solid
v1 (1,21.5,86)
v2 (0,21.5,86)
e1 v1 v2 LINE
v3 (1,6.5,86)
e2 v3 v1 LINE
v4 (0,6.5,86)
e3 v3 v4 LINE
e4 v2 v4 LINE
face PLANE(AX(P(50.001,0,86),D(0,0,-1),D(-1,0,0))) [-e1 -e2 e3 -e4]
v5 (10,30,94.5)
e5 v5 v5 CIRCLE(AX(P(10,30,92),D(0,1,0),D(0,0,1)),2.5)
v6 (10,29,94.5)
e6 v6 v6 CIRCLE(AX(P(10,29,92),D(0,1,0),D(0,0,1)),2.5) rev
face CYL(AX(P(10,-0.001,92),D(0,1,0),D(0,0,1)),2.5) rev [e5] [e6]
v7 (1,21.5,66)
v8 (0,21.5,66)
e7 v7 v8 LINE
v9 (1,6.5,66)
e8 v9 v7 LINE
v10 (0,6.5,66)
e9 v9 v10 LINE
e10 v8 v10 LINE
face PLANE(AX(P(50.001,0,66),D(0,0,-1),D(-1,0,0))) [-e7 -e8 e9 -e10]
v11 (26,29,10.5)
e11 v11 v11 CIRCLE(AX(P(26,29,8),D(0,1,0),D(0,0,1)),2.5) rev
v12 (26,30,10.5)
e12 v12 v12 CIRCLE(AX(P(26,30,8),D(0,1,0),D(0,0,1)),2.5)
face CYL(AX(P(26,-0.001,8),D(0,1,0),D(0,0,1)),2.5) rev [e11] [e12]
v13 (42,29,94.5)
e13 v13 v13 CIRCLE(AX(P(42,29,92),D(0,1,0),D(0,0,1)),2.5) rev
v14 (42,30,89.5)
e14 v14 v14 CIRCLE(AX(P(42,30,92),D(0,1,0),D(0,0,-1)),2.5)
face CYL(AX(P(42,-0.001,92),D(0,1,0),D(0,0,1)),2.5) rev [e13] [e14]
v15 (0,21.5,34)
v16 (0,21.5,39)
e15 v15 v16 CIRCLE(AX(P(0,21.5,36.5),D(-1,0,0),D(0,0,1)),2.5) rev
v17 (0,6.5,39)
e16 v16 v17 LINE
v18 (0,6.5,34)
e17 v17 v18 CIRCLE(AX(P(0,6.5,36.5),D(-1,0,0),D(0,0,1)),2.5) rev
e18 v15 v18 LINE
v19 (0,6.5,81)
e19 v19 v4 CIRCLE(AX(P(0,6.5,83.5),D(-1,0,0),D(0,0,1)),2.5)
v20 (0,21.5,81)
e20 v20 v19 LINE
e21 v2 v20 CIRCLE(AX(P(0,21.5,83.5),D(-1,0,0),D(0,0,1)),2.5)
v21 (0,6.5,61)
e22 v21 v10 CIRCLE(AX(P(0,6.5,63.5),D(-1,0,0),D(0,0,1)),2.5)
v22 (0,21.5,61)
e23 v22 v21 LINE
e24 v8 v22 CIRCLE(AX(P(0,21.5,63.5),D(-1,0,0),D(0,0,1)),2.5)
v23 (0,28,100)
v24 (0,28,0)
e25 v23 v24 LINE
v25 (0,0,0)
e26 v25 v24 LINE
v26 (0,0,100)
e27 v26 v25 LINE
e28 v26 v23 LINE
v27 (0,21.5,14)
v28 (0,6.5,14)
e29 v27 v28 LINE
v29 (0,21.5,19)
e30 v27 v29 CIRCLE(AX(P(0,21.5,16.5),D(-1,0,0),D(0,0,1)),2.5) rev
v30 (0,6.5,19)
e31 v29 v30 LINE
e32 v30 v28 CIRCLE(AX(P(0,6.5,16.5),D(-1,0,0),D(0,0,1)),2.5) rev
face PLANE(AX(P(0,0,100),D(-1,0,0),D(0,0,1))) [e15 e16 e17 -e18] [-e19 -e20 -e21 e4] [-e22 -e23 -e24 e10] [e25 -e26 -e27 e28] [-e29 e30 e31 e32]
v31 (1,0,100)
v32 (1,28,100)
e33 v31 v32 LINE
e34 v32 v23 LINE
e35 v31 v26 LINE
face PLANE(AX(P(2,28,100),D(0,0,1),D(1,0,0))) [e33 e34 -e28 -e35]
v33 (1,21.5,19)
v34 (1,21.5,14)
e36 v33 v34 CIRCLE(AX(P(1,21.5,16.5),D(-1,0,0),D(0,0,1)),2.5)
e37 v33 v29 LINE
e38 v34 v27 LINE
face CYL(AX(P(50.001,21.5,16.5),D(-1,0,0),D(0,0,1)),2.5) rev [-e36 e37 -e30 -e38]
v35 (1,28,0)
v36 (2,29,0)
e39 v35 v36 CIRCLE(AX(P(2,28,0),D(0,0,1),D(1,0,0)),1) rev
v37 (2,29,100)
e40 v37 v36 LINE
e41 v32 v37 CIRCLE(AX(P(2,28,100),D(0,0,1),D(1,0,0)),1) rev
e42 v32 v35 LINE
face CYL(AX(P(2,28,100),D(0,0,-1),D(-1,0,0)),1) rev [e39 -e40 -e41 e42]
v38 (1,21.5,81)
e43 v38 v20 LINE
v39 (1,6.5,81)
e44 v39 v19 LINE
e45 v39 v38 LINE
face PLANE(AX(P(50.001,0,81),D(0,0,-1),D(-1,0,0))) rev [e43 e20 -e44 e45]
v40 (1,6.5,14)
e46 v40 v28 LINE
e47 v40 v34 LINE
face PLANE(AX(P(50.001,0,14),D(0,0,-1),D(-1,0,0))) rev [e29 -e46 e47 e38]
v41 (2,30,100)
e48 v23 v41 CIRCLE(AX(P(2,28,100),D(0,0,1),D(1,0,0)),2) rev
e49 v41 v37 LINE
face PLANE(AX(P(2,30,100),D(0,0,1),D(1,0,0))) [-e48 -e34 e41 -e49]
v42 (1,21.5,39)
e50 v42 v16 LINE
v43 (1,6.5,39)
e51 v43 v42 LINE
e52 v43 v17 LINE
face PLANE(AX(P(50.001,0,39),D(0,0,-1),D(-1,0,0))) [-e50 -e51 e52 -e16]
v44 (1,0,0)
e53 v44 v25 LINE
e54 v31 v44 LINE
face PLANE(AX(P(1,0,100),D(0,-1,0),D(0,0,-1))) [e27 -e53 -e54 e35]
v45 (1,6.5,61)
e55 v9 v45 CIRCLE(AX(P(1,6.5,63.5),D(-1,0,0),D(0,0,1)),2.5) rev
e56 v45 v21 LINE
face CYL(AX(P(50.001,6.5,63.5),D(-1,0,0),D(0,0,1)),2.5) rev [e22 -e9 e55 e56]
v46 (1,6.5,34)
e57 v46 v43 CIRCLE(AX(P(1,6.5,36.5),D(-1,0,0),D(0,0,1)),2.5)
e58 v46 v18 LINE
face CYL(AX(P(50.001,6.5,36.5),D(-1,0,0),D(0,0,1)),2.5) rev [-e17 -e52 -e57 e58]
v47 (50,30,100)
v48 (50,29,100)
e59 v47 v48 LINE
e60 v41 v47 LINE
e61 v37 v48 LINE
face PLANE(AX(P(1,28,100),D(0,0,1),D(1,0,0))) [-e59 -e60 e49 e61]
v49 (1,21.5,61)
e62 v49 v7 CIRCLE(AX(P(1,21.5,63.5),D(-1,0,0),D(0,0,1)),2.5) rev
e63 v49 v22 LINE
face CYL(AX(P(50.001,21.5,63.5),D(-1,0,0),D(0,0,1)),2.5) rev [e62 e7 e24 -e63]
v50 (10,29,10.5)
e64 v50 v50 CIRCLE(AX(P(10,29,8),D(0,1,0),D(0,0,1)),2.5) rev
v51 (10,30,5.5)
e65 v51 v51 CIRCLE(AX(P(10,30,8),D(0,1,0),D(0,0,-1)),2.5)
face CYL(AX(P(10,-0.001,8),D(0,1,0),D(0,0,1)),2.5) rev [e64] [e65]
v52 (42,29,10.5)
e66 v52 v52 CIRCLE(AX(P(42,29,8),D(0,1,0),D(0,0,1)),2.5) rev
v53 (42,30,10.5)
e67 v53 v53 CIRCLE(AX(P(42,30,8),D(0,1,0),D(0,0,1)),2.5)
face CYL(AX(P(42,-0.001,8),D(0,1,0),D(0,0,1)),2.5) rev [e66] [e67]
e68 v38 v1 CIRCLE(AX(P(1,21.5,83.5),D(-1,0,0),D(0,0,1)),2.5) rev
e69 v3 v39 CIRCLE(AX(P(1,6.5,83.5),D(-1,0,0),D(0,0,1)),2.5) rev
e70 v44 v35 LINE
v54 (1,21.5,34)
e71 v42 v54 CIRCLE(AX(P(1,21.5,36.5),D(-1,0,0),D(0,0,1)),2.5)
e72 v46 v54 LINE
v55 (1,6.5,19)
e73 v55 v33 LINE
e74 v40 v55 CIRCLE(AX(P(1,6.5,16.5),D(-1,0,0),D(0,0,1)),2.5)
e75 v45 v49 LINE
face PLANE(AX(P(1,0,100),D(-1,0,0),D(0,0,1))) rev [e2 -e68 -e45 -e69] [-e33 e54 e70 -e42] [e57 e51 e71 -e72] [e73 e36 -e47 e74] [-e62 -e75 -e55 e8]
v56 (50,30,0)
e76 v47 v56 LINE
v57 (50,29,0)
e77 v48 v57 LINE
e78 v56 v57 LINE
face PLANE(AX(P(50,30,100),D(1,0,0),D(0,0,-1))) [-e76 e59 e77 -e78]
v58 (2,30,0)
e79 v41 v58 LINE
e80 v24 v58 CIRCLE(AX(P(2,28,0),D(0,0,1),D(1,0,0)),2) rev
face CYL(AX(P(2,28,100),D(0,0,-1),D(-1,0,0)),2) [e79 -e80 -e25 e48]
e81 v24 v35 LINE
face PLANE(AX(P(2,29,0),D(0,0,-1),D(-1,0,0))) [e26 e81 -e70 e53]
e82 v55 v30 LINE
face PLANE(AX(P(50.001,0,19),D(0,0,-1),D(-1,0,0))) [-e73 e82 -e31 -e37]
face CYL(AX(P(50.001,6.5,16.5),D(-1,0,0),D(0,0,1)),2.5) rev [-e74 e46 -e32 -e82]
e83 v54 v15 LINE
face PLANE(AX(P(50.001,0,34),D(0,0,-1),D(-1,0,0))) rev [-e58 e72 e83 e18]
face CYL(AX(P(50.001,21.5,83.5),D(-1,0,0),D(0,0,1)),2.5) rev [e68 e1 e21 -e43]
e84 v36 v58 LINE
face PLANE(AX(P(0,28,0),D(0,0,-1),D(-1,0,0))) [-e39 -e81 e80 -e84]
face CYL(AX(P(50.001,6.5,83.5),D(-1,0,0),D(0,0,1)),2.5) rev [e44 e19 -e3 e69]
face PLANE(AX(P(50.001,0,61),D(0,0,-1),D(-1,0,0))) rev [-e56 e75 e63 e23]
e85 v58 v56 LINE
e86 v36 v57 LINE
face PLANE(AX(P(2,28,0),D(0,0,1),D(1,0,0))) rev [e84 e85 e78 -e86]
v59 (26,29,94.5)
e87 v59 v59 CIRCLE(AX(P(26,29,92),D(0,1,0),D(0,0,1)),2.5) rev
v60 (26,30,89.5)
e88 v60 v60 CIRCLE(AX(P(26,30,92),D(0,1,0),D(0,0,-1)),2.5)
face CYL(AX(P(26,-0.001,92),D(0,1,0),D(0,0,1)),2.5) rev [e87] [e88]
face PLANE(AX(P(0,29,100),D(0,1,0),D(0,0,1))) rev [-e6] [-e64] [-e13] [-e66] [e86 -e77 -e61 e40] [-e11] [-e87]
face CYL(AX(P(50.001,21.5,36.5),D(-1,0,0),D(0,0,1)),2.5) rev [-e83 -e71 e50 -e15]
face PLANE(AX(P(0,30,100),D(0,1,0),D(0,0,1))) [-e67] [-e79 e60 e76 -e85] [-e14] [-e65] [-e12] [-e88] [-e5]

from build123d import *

# Parameters (mm, degrees)
BASE_FLANGE1_DEPTH = 100
CUT_EXTRUDE3_REACH = 117.758
SKETCH8_R          = 2.5
CUT_EXTRUDE4_REACH = 117.758
SKETCH11_R         = 2.5


# Sheet-metal steps are written as plain solids
with BuildPart() as part:
    # Sketch2 → Base-Flange1 (new body)
    with BuildSketch(Plane.XY):
        with BuildLine():
            Line((0, 0), (0, 28))
            ThreePointArc((0, 28), (0.585786438, 29.414213562), (2, 30))
            Line((2, 30), (50, 30))
            Line((50, 30), (50, 29))
            Line((50, 29), (2, 29))
            ThreePointArc((2, 29), (1.292893219, 28.707106781), (1, 28))
            Line((1, 28), (1, 0))
            Line((1, 0), (0, 0))
        make_face()
    extrude(amount=BASE_FLANGE1_DEPTH)

    # Sketch8 → Cut-Extrude3 (cut, up to next)
    with BuildSketch(Plane(origin=(0, 30, 0), x_dir=(1, 0, 0), z_dir=(0, 1, 0)), mode=Mode.PRIVATE) as cut_extrude3_sk1:
        with Locations(Location((42, -8, 0), (0, 0, 270))):
            Circle(SKETCH8_R)
    cut_extrude3_tool1 = extrude(cut_extrude3_sk1.sketch, amount=-CUT_EXTRUDE3_REACH, mode=Mode.PRIVATE) & part.part
    # Sketch8 → Cut-Extrude3 (cut, up to next)
    with BuildSketch(Plane(origin=(0, 30, 0), x_dir=(1, 0, 0), z_dir=(0, 1, 0)), mode=Mode.PRIVATE) as cut_extrude3_sk2:
        with Locations(Location((10, -8, 0), (0, 0, 270))):
            Circle(SKETCH8_R)
    cut_extrude3_tool2 = extrude(cut_extrude3_sk2.sketch, amount=-CUT_EXTRUDE3_REACH, mode=Mode.PRIVATE) & part.part
    # Sketch8 → Cut-Extrude3 (cut, up to next)
    with BuildSketch(Plane(origin=(0, 30, 0), x_dir=(1, 0, 0), z_dir=(0, 1, 0)), mode=Mode.PRIVATE) as cut_extrude3_sk3:
        with Locations(Location((42, -92, 0), (0, 0, 270))):
            Circle(SKETCH8_R)
    cut_extrude3_tool3 = extrude(cut_extrude3_sk3.sketch, amount=-CUT_EXTRUDE3_REACH, mode=Mode.PRIVATE) & part.part
    # Sketch8 → Cut-Extrude3 (cut, up to next)
    with BuildSketch(Plane(origin=(0, 30, 0), x_dir=(1, 0, 0), z_dir=(0, 1, 0)), mode=Mode.PRIVATE) as cut_extrude3_sk4:
        with Locations(Location((10, -92, 0), (0, 0, 270))):
            Circle(SKETCH8_R)
    cut_extrude3_tool4 = extrude(cut_extrude3_sk4.sketch, amount=-CUT_EXTRUDE3_REACH, mode=Mode.PRIVATE) & part.part
    # Sketch8 → Cut-Extrude3 (cut, up to next)
    with BuildSketch(Plane(origin=(0, 30, 0), x_dir=(1, 0, 0), z_dir=(0, 1, 0)), mode=Mode.PRIVATE) as cut_extrude3_sk5:
        with Locations(Location((26, -8, 0), (0, 0, 270))):
            Circle(SKETCH8_R)
    cut_extrude3_tool5 = extrude(cut_extrude3_sk5.sketch, amount=-CUT_EXTRUDE3_REACH, mode=Mode.PRIVATE) & part.part
    # Sketch8 → Cut-Extrude3 (cut, up to next)
    with BuildSketch(Plane(origin=(0, 30, 0), x_dir=(1, 0, 0), z_dir=(0, 1, 0)), mode=Mode.PRIVATE) as cut_extrude3_sk6:
        with Locations(Location((26, -92, 0), (0, 0, 270))):
            Circle(SKETCH8_R)
    cut_extrude3_tool6 = extrude(cut_extrude3_sk6.sketch, amount=-CUT_EXTRUDE3_REACH, mode=Mode.PRIVATE) & part.part
    add(cut_extrude3_tool1.solids().sort_by_distance((42, 30, 8))[0], mode=Mode.SUBTRACT)
    add(cut_extrude3_tool2.solids().sort_by_distance((10, 30, 8))[0], mode=Mode.SUBTRACT)
    add(cut_extrude3_tool3.solids().sort_by_distance((42, 30, 92))[0], mode=Mode.SUBTRACT)
    add(cut_extrude3_tool4.solids().sort_by_distance((10, 30, 92))[0], mode=Mode.SUBTRACT)
    add(cut_extrude3_tool5.solids().sort_by_distance((26, 30, 8))[0], mode=Mode.SUBTRACT)
    add(cut_extrude3_tool6.solids().sort_by_distance((26, 30, 92))[0], mode=Mode.SUBTRACT)

    # Sketch11 → Cut-Extrude4 (cut, up to next)
    with BuildSketch(Plane.ZY, mode=Mode.PRIVATE) as cut_extrude4_sk1:
        with BuildLine():
            ThreePointArc((19, 21.5), (16.5, 24), (14, 21.5))
            Line((14, 21.5), (14, 13.999999995))
            ThreePointArc((14, 13.999999995), (16.499999997, 16.5), (19, 14))
            Line((19, 14), (19, 21.5))
        make_face()
    cut_extrude4_tool1 = extrude(cut_extrude4_sk1.sketch, amount=-CUT_EXTRUDE4_REACH, mode=Mode.PRIVATE) & part.part
    # Sketch11 → Cut-Extrude4 (cut, up to next)
    with BuildSketch(Plane.ZY, mode=Mode.PRIVATE) as cut_extrude4_sk2:
        with BuildLine():
            ThreePointArc((19, 14), (16.500000003, 11.5), (14, 13.999999995))
            Line((14, 13.999999995), (14, 6.5))
            ThreePointArc((14, 6.5), (16.5, 4), (19, 6.5))
            Line((19, 6.5), (19, 14))
        make_face()
    cut_extrude4_tool2 = extrude(cut_extrude4_sk2.sketch, amount=-CUT_EXTRUDE4_REACH, mode=Mode.PRIVATE) & part.part
    # Sketch11 → Cut-Extrude4 (cut, up to next)
    with BuildSketch(Plane.ZY, mode=Mode.PRIVATE) as cut_extrude4_sk3:
        with Locations((16.5, 14)):
            Circle(SKETCH11_R)
    cut_extrude4_tool3 = extrude(cut_extrude4_sk3.sketch, amount=-CUT_EXTRUDE4_REACH, mode=Mode.PRIVATE) & part.part
    # Sketch11 → Cut-Extrude4 (cut, up to next)
    with BuildSketch(Plane.ZY, mode=Mode.PRIVATE) as cut_extrude4_sk4:
        with BuildLine():
            ThreePointArc((39, 14), (36.5, 11.5), (34, 14))
            Line((34, 14), (34, 6.5))
            ThreePointArc((34, 6.5), (36.5, 4), (39, 6.5))
            Line((39, 6.5), (39, 14))
        make_face()
    cut_extrude4_tool4 = extrude(cut_extrude4_sk4.sketch, amount=-CUT_EXTRUDE4_REACH, mode=Mode.PRIVATE) & part.part
    # Sketch11 → Cut-Extrude4 (cut, up to next)
    with BuildSketch(Plane.ZY, mode=Mode.PRIVATE) as cut_extrude4_sk5:
        with Locations((36.5, 14)):
            Circle(SKETCH11_R)
    cut_extrude4_tool5 = extrude(cut_extrude4_sk5.sketch, amount=-CUT_EXTRUDE4_REACH, mode=Mode.PRIVATE) & part.part
    # Sketch11 → Cut-Extrude4 (cut, up to next)
    with BuildSketch(Plane.ZY, mode=Mode.PRIVATE) as cut_extrude4_sk6:
        with BuildLine():
            ThreePointArc((39, 21.5), (36.5, 24), (34, 21.5))
            Line((34, 21.5), (34, 14))
            ThreePointArc((34, 14), (36.5, 16.5), (39, 14))
            Line((39, 14), (39, 21.5))
        make_face()
    cut_extrude4_tool6 = extrude(cut_extrude4_sk6.sketch, amount=-CUT_EXTRUDE4_REACH, mode=Mode.PRIVATE) & part.part
    # Sketch11 → Cut-Extrude4 (cut, up to next)
    with BuildSketch(Plane.ZY, mode=Mode.PRIVATE) as cut_extrude4_sk7:
        with BuildLine():
            Line((86, 14), (86, 21.5))
            ThreePointArc((86, 21.5), (83.5, 24), (81, 21.5))
            Line((81, 21.5), (81, 14))
            ThreePointArc((81, 14), (83.5, 16.5), (86, 14))
        make_face()
    cut_extrude4_tool7 = extrude(cut_extrude4_sk7.sketch, amount=-CUT_EXTRUDE4_REACH, mode=Mode.PRIVATE) & part.part
    # Sketch11 → Cut-Extrude4 (cut, up to next)
    with BuildSketch(Plane.ZY, mode=Mode.PRIVATE) as cut_extrude4_sk8:
        with BuildLine():
            Line((86, 6.5), (86, 14))
            ThreePointArc((86, 14), (83.5, 11.5), (81, 14))
            Line((81, 14), (81, 6.5))
            ThreePointArc((81, 6.5), (83.5, 4), (86, 6.5))
        make_face()
    cut_extrude4_tool8 = extrude(cut_extrude4_sk8.sketch, amount=-CUT_EXTRUDE4_REACH, mode=Mode.PRIVATE) & part.part
    # Sketch11 → Cut-Extrude4 (cut, up to next)
    with BuildSketch(Plane.ZY, mode=Mode.PRIVATE) as cut_extrude4_sk9:
        with Locations((83.5, 14)):
            Circle(SKETCH11_R)
    cut_extrude4_tool9 = extrude(cut_extrude4_sk9.sketch, amount=-CUT_EXTRUDE4_REACH, mode=Mode.PRIVATE) & part.part
    # Sketch11 → Cut-Extrude4 (cut, up to next)
    with BuildSketch(Plane.ZY, mode=Mode.PRIVATE) as cut_extrude4_sk10:
        with BuildLine():
            ThreePointArc((66, 21.5), (63.5, 24), (61, 21.5))
            Line((61, 21.5), (61, 14))
            ThreePointArc((61, 14), (63.5, 16.5), (66, 14))
            Line((66, 14), (66, 21.5))
        make_face()
    cut_extrude4_tool10 = extrude(cut_extrude4_sk10.sketch, amount=-CUT_EXTRUDE4_REACH, mode=Mode.PRIVATE) & part.part
    # Sketch11 → Cut-Extrude4 (cut, up to next)
    with BuildSketch(Plane.ZY, mode=Mode.PRIVATE) as cut_extrude4_sk11:
        with Locations((63.5, 14)):
            Circle(SKETCH11_R)
    cut_extrude4_tool11 = extrude(cut_extrude4_sk11.sketch, amount=-CUT_EXTRUDE4_REACH, mode=Mode.PRIVATE) & part.part
    # Sketch11 → Cut-Extrude4 (cut, up to next)
    with BuildSketch(Plane.ZY, mode=Mode.PRIVATE) as cut_extrude4_sk12:
        with BuildLine():
            ThreePointArc((66, 14), (63.5, 11.5), (61, 14))
            Line((61, 14), (61, 6.5))
            ThreePointArc((61, 6.5), (63.5, 4), (66, 6.5))
            Line((66, 6.5), (66, 14))
        make_face()
    cut_extrude4_tool12 = extrude(cut_extrude4_sk12.sketch, amount=-CUT_EXTRUDE4_REACH, mode=Mode.PRIVATE) & part.part
    add(cut_extrude4_tool1.solids().sort_by_distance((0, 19.713495, 16.5))[0], mode=Mode.SUBTRACT)
    add(cut_extrude4_tool2.solids().sort_by_distance((0, 8.286505, 16.5))[0], mode=Mode.SUBTRACT)
    add(cut_extrude4_tool3.solids().sort_by_distance((0, 14, 16.5))[0], mode=Mode.SUBTRACT)
    add(cut_extrude4_tool4.solids().sort_by_distance((0, 8.286505, 36.5))[0], mode=Mode.SUBTRACT)
    add(cut_extrude4_tool5.solids().sort_by_distance((0, 14, 36.5))[0], mode=Mode.SUBTRACT)
    add(cut_extrude4_tool6.solids().sort_by_distance((0, 19.713495, 36.5))[0], mode=Mode.SUBTRACT)
    add(cut_extrude4_tool7.solids().sort_by_distance((0, 19.713495, 83.5))[0], mode=Mode.SUBTRACT)
    add(cut_extrude4_tool8.solids().sort_by_distance((0, 8.286505, 83.5))[0], mode=Mode.SUBTRACT)
    add(cut_extrude4_tool9.solids().sort_by_distance((0, 14, 83.5))[0], mode=Mode.SUBTRACT)
    add(cut_extrude4_tool10.solids().sort_by_distance((0, 19.713495, 63.5))[0], mode=Mode.SUBTRACT)
    add(cut_extrude4_tool11.solids().sort_by_distance((0, 14, 63.5))[0], mode=Mode.SUBTRACT)
    add(cut_extrude4_tool12.solids().sort_by_distance((0, 8.286505, 63.5))[0], mode=Mode.SUBTRACT)


solid = part.part
